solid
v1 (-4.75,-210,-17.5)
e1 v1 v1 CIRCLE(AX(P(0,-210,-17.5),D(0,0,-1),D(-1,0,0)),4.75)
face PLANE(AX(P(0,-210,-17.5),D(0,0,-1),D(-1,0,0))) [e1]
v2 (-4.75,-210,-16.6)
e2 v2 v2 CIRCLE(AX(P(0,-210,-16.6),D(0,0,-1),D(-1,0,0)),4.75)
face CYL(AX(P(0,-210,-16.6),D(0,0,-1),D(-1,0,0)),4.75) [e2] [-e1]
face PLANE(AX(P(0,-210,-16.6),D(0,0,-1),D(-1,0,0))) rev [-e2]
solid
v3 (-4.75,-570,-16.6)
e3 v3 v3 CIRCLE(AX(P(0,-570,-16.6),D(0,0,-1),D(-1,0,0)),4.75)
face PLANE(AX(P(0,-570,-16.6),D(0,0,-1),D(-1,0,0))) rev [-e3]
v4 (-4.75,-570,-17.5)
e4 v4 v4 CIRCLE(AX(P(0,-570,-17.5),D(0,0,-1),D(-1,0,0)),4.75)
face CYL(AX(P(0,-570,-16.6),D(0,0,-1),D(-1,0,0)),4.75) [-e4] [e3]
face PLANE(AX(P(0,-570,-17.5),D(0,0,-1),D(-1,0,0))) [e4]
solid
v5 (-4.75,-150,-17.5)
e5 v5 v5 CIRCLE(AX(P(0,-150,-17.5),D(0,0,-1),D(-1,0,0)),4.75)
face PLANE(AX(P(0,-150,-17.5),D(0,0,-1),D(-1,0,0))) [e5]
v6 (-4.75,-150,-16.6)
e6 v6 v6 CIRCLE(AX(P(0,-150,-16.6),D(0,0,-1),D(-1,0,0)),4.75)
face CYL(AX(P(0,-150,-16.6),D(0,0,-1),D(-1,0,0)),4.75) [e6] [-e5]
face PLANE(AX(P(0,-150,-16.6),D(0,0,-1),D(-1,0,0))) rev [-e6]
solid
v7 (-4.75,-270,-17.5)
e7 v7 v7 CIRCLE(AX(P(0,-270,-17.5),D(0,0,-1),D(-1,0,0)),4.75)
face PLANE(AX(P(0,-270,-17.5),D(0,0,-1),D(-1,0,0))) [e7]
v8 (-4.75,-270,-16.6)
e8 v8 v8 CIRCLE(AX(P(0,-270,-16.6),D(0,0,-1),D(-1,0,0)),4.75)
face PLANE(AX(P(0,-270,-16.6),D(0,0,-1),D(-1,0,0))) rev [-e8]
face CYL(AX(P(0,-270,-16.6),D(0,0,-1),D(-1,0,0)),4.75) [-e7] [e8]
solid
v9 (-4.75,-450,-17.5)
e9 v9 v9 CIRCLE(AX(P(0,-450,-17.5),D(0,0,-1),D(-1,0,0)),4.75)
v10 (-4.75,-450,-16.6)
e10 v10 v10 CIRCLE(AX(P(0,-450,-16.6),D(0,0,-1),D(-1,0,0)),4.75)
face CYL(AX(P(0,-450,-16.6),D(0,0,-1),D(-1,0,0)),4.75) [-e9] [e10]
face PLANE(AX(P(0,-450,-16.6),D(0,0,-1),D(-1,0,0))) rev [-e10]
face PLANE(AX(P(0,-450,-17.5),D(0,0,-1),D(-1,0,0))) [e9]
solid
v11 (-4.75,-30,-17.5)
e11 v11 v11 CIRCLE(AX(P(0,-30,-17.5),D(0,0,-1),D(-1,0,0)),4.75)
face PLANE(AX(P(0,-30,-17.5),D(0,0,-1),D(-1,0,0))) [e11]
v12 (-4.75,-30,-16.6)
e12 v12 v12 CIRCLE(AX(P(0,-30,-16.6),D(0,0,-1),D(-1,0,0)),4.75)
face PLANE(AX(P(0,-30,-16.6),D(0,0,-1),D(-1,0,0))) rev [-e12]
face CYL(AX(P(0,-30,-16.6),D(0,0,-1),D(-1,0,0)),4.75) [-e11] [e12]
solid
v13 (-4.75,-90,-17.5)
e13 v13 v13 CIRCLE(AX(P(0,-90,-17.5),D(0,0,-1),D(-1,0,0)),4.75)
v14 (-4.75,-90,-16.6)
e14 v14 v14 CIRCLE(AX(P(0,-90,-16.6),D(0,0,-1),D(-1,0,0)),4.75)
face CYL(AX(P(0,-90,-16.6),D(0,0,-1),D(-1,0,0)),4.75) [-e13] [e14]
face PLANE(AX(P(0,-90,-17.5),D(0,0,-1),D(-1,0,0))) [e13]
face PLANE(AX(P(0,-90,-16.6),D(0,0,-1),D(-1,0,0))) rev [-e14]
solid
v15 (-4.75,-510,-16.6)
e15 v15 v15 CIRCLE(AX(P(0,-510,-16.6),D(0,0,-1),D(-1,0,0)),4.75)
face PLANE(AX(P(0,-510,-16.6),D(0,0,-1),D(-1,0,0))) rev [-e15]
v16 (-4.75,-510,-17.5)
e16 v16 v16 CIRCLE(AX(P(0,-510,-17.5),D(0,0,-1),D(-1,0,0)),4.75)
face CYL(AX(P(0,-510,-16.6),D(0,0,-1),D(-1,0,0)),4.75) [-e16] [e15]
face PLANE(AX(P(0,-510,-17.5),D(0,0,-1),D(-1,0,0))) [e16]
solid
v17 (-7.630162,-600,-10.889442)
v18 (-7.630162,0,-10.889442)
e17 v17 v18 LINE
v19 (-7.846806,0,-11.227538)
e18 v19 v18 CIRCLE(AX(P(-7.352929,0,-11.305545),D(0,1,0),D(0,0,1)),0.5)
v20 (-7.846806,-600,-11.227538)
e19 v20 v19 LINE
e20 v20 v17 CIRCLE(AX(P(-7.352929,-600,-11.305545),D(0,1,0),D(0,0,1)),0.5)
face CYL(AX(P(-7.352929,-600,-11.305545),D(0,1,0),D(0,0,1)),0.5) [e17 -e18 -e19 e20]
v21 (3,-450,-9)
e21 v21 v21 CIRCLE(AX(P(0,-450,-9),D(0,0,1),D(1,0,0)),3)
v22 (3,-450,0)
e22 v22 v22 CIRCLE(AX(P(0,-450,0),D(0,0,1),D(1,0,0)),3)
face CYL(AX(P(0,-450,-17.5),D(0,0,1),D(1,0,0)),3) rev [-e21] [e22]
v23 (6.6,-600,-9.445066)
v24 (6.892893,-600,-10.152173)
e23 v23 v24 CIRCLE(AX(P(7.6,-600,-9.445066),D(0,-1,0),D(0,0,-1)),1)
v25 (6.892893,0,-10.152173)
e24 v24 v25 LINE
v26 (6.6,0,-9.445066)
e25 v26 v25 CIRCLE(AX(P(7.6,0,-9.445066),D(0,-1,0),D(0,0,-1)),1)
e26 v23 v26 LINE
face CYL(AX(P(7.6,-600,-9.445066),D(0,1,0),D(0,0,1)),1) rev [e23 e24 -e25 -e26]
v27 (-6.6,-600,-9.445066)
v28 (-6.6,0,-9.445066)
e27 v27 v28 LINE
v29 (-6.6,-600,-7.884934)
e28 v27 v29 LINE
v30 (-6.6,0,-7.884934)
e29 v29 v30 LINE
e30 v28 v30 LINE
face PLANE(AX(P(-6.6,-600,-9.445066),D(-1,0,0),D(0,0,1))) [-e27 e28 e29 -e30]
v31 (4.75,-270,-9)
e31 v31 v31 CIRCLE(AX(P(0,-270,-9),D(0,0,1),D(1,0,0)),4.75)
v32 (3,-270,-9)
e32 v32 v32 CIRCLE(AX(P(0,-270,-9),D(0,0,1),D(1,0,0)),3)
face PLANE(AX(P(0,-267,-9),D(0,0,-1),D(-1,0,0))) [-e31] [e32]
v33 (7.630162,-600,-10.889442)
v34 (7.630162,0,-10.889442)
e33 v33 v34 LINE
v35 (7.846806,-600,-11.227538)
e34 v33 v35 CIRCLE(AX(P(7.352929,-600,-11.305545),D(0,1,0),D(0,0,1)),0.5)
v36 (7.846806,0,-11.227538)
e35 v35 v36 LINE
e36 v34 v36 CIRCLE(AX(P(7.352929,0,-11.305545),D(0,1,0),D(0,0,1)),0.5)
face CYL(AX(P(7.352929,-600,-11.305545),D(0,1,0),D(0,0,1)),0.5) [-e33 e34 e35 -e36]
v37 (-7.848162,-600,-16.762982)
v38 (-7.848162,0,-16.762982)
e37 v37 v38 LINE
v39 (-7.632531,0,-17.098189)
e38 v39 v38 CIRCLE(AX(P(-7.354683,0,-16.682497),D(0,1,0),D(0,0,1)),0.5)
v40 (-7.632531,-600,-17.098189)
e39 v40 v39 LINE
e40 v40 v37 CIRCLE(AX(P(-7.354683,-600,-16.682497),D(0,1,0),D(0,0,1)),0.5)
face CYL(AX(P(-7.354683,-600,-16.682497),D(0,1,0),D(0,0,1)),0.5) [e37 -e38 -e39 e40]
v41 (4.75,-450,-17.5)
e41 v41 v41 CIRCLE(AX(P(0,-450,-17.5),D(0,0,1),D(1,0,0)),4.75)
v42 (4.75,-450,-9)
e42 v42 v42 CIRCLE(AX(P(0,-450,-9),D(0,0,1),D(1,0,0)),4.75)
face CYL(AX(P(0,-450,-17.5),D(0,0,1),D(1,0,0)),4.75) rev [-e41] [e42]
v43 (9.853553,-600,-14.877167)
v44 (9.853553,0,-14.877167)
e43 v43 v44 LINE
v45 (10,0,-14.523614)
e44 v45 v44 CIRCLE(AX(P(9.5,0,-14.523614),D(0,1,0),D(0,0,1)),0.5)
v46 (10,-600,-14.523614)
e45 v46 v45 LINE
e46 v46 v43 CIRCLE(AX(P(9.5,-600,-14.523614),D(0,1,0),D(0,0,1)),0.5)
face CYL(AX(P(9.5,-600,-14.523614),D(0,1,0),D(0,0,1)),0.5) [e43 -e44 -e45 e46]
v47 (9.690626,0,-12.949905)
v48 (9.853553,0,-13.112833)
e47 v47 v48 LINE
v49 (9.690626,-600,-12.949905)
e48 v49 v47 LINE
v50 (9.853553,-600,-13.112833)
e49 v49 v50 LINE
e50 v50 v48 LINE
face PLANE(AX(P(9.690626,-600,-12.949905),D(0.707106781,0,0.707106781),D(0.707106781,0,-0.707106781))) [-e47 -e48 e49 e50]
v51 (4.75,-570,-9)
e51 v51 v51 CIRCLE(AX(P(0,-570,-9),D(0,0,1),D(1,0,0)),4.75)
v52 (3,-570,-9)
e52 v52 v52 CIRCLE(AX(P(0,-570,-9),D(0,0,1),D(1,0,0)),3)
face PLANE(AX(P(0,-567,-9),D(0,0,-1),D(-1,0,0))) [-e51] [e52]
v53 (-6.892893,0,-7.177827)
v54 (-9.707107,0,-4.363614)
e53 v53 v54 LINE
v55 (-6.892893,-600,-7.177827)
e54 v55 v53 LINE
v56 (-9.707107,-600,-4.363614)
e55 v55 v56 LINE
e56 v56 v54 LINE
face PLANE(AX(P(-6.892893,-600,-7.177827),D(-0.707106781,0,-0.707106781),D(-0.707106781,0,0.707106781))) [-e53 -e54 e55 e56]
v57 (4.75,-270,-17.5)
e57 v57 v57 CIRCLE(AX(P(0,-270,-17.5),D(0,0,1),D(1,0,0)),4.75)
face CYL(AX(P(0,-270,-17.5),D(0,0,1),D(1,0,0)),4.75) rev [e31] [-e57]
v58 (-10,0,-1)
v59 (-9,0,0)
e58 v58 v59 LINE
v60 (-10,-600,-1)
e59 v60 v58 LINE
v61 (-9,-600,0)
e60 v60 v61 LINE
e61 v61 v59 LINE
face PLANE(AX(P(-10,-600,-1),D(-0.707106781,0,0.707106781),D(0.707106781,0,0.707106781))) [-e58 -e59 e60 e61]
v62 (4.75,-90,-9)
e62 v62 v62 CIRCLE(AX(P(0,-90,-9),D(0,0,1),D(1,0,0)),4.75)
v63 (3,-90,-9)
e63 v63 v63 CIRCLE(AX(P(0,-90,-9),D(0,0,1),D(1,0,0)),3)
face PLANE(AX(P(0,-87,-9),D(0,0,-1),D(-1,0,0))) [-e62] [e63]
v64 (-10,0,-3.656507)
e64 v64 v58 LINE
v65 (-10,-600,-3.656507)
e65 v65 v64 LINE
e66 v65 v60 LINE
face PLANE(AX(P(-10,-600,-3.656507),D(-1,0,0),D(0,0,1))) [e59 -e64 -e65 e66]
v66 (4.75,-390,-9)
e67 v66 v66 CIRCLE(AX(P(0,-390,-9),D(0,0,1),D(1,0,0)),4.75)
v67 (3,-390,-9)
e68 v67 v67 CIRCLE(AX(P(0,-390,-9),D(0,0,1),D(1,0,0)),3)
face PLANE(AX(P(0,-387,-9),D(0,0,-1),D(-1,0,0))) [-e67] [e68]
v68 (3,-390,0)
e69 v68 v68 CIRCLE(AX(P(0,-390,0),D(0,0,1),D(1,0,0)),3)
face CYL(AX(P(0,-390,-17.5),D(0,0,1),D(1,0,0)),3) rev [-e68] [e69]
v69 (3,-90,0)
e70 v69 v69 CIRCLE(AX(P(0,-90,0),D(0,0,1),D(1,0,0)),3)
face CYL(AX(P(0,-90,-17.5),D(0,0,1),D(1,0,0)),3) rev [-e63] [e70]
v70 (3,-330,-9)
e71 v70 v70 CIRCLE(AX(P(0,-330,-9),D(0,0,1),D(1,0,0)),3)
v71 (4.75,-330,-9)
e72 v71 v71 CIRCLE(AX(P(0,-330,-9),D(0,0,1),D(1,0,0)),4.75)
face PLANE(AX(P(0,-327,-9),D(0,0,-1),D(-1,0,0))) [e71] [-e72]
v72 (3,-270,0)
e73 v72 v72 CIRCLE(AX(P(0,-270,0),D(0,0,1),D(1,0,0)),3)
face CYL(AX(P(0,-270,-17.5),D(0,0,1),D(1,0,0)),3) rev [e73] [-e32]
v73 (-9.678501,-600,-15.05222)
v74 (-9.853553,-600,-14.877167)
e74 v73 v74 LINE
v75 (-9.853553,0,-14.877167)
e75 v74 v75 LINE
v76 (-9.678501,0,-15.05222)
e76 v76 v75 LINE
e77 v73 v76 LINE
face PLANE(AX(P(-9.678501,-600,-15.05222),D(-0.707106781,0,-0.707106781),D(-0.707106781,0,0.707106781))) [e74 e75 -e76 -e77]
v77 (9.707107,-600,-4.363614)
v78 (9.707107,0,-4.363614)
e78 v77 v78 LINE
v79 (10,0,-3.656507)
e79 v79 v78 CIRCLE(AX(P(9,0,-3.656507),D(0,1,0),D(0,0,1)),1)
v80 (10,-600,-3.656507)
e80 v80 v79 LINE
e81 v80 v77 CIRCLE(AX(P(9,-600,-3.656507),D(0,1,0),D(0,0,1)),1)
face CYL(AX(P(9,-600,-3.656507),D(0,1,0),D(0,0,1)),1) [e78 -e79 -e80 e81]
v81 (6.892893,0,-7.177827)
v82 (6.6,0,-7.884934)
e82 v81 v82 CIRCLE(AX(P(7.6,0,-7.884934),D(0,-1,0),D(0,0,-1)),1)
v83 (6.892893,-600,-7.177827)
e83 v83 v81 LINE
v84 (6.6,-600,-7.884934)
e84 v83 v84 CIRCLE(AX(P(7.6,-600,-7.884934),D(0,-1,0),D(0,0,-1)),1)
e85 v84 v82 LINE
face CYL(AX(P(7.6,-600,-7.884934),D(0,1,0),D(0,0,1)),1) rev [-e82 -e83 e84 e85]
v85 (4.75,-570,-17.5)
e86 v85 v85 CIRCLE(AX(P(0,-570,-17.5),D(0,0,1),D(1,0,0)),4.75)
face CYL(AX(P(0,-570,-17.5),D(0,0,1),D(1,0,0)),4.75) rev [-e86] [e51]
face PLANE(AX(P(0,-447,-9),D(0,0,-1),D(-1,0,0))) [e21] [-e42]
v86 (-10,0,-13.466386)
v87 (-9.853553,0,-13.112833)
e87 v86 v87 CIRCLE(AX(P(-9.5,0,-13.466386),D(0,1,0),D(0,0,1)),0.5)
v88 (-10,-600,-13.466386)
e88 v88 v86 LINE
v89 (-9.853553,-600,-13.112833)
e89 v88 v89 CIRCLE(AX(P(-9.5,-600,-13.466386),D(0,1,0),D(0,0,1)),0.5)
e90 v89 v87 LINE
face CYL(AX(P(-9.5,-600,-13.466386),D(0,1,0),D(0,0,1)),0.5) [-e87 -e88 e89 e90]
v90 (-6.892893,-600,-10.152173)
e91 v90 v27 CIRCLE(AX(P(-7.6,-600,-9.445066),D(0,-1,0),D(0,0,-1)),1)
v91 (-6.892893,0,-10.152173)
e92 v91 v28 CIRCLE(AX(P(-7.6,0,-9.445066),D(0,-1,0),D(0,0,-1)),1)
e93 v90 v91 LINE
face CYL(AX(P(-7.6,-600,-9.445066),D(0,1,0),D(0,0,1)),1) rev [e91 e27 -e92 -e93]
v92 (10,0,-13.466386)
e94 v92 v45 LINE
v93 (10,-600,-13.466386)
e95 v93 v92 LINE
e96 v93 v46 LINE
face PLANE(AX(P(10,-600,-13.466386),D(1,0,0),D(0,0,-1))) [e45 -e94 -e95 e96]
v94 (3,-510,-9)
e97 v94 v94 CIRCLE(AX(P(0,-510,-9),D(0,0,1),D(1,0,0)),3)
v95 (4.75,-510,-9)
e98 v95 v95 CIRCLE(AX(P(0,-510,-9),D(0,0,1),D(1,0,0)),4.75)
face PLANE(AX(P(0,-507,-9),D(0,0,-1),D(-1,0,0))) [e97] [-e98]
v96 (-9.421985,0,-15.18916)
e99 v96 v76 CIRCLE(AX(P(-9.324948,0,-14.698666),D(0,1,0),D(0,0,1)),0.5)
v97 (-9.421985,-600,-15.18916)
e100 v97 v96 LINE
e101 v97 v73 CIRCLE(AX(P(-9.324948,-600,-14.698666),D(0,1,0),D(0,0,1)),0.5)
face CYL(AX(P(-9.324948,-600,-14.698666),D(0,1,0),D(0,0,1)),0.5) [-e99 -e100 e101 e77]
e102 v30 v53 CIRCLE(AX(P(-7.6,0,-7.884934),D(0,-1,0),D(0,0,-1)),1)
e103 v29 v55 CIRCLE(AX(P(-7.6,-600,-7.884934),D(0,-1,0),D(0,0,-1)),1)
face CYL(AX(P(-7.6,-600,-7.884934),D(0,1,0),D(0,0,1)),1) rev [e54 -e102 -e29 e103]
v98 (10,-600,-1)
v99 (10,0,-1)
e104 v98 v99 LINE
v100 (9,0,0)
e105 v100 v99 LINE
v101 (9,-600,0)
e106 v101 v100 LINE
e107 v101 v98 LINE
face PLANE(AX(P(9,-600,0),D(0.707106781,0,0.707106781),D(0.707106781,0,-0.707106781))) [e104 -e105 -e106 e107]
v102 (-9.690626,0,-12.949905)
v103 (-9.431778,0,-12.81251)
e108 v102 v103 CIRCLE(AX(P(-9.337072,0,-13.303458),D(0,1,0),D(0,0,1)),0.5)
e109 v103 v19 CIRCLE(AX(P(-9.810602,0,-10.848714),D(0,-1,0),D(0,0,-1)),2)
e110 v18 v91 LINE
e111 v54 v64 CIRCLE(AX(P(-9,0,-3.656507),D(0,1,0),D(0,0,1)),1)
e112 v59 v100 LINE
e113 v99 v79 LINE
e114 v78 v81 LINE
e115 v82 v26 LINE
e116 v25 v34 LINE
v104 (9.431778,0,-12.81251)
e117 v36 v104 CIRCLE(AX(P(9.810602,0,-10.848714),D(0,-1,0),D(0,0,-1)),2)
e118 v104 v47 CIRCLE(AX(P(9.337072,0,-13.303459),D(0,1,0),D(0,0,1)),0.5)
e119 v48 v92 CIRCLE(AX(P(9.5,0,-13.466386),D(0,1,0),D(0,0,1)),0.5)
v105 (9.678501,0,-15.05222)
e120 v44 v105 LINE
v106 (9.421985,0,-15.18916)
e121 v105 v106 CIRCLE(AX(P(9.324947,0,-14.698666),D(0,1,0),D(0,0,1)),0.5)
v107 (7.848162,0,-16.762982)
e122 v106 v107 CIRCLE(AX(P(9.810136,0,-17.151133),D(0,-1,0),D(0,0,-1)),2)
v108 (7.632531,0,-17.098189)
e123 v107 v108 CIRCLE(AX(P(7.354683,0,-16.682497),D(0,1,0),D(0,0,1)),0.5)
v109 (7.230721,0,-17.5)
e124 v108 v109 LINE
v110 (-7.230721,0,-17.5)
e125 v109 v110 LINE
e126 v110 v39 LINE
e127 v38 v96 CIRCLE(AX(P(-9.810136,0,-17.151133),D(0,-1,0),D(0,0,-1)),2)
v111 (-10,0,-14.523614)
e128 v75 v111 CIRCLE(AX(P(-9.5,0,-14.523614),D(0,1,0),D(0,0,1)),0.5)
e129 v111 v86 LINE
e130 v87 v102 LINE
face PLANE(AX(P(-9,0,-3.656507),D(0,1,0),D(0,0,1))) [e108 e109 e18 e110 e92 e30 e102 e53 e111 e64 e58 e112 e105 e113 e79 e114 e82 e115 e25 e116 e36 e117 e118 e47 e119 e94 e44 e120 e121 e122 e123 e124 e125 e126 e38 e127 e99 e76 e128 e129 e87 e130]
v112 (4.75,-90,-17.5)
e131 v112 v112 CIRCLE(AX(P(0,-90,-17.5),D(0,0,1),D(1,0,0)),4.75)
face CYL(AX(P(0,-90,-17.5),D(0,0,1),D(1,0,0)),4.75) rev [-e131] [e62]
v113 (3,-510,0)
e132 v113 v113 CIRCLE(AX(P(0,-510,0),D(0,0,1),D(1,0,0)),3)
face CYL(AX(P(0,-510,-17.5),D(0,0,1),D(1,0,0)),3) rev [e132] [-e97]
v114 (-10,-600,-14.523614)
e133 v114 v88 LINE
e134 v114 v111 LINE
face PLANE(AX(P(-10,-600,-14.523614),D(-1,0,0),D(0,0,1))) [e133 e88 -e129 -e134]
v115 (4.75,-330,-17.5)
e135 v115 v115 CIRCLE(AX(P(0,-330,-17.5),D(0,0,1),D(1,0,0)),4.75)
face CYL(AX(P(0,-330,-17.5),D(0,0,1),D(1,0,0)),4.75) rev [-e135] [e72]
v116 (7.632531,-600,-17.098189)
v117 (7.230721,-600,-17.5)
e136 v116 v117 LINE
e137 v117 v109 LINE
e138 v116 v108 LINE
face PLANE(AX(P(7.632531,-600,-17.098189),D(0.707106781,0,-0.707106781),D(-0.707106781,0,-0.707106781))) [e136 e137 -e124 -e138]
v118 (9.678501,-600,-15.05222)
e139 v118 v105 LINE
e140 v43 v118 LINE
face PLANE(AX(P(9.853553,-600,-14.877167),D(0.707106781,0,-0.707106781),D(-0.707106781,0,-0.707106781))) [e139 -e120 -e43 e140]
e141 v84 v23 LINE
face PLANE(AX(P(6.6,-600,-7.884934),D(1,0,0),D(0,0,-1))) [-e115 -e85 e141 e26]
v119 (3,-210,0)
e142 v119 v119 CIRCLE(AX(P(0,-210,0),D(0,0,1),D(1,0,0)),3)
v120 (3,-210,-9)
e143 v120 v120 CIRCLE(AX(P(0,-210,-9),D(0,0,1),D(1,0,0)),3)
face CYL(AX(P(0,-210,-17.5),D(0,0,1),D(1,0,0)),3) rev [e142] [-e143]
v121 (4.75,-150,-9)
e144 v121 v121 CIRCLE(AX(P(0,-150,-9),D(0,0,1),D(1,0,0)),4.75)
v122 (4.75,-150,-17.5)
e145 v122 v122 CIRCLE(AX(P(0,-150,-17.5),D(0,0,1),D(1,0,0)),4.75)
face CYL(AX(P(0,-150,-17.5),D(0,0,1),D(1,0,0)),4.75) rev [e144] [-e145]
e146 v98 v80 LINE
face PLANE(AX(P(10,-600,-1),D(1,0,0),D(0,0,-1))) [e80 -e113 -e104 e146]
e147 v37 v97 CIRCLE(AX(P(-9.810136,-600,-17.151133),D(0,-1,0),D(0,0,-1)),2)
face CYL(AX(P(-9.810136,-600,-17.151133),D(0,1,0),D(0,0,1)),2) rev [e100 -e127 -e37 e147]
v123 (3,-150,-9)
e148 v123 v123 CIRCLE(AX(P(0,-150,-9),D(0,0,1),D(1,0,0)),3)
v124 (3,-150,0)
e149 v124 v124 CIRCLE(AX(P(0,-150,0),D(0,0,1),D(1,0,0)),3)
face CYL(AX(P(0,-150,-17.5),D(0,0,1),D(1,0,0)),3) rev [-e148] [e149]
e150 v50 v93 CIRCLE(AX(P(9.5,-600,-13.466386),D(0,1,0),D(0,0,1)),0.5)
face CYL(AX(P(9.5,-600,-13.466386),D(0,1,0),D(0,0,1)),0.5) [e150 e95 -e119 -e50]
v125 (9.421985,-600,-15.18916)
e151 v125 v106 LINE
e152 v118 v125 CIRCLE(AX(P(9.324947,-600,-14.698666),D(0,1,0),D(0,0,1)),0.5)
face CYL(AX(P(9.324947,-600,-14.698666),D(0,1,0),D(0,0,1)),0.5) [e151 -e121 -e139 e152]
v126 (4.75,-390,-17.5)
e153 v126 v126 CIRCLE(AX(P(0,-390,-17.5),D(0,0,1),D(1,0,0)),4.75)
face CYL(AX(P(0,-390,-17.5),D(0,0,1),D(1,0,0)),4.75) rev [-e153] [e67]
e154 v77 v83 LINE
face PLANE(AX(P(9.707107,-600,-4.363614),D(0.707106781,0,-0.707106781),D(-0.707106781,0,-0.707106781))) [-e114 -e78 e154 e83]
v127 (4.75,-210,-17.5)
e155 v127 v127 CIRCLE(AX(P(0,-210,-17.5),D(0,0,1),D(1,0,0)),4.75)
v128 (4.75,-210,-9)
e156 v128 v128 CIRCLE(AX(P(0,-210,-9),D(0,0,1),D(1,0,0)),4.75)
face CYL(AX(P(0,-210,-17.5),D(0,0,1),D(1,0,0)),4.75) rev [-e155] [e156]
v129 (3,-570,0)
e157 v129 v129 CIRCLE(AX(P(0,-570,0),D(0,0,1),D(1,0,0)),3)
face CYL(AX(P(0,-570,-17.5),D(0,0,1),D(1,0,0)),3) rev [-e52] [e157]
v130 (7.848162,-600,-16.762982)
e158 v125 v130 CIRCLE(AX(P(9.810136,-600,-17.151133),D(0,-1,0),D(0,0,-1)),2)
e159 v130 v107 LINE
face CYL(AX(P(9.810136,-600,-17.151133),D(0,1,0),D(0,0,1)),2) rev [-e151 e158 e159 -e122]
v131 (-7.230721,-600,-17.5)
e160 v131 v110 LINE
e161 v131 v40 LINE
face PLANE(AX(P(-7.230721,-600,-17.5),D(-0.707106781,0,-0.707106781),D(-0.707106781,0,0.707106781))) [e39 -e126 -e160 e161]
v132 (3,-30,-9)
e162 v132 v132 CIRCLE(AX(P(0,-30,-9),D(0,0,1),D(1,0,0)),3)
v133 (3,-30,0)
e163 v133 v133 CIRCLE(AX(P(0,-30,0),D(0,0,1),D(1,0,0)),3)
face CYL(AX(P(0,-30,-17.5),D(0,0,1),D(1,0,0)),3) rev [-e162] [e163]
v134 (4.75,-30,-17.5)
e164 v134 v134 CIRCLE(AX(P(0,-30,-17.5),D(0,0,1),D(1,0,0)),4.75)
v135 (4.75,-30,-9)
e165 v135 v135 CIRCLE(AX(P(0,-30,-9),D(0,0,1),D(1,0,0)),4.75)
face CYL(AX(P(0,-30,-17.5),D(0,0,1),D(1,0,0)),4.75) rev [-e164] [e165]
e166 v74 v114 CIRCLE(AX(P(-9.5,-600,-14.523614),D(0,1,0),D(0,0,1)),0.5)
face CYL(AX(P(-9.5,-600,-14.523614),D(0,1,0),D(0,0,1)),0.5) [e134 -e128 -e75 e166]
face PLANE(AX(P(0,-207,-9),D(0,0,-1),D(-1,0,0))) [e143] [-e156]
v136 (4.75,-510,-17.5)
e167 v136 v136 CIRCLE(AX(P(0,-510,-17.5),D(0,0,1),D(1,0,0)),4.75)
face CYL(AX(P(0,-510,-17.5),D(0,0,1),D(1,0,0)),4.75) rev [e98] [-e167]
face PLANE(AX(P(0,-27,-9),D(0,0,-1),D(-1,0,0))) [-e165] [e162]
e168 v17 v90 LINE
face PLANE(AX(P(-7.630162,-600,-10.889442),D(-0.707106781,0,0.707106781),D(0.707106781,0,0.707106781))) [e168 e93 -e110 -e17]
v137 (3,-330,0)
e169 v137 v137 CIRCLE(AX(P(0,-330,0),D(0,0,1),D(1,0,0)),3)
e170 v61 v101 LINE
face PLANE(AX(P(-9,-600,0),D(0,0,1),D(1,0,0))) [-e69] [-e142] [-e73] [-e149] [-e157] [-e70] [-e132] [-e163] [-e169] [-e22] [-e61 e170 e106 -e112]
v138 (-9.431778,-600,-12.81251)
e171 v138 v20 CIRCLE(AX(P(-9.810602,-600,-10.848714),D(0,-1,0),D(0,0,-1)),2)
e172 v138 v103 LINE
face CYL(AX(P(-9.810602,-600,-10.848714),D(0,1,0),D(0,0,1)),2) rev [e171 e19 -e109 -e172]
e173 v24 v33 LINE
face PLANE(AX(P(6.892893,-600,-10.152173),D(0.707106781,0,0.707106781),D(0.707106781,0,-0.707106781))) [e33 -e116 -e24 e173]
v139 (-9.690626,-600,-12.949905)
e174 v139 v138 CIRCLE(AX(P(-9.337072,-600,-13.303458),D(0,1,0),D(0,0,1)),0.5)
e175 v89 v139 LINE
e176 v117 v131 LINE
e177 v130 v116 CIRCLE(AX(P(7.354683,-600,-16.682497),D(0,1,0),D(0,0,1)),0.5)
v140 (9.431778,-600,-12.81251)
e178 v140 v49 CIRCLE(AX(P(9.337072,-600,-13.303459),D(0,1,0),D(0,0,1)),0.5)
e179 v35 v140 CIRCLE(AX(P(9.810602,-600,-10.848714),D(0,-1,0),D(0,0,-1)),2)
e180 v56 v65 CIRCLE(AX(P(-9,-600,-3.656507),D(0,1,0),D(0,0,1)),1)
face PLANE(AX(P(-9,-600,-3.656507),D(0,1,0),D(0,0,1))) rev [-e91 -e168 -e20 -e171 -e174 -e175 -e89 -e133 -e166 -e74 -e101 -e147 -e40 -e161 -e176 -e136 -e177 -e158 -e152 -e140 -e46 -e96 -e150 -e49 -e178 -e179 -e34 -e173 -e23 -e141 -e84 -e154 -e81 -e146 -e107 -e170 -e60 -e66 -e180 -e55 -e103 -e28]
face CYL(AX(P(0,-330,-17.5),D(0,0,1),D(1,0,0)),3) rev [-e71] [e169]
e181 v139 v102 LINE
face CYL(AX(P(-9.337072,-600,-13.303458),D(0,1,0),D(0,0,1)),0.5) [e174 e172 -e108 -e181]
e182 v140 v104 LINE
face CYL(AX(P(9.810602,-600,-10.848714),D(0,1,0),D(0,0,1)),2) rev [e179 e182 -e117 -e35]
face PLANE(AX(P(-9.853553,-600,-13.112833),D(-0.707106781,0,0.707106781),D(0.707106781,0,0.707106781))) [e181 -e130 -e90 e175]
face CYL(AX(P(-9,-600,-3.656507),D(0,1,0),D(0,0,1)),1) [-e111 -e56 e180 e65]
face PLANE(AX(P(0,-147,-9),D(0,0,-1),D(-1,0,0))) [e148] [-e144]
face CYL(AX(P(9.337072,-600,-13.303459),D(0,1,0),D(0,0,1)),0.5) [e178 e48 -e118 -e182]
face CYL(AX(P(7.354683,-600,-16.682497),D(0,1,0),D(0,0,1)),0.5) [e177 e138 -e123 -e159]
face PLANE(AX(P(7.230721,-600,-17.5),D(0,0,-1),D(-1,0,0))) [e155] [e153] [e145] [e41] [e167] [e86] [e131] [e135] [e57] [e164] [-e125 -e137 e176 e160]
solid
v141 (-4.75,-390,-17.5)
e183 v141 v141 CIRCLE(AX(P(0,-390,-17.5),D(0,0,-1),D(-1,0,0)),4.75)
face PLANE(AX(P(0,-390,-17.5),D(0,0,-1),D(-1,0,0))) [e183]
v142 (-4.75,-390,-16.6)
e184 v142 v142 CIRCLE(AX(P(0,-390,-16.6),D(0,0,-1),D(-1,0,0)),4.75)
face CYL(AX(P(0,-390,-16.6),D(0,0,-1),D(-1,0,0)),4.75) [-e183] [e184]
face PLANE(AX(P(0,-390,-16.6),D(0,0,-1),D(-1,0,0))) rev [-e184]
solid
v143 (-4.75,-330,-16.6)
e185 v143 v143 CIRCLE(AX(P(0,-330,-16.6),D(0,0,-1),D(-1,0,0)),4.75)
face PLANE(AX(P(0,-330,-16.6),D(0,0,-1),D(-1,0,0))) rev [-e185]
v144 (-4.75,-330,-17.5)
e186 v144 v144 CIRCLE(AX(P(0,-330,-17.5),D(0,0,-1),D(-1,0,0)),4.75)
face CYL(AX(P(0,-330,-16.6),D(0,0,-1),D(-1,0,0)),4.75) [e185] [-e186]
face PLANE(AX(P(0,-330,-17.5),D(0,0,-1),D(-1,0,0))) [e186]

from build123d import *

# Parameters (mm, degrees)
EXTRUDE_1_DEPTH               = 600
SKETCH_80_R                   = 4.75
EXTRUDE_12_DEPTH              = 0.9
PATTERN_START                 = -17.499999985
PATTERN_LINEAR_1_OUTLINE_R    = 4.75
PATTERN_LINEAR_1_DEPTH        = 0.9
PATTERN_LINEAR_1_2_OUTLINE_R  = 4.75
PATTERN_LINEAR_1_2_DEPTH      = 0.9
PATTERN_LINEAR_1_3_OUTLINE_R  = 4.75
PATTERN_LINEAR_1_3_DEPTH      = 0.9
PATTERN_LINEAR_1_4_OUTLINE_R  = 4.75
PATTERN_LINEAR_1_4_DEPTH      = 0.9
PATTERN_LINEAR_1_5_OUTLINE_R  = 4.75
PATTERN_LINEAR_1_5_DEPTH      = 0.9
PATTERN_LINEAR_1_6_OUTLINE_R  = 4.75
PATTERN_LINEAR_1_6_DEPTH      = 0.9
PATTERN_LINEAR_1_7_OUTLINE_R  = 4.75
PATTERN_LINEAR_1_7_DEPTH      = 0.9
PATTERN_LINEAR_1_8_OUTLINE_R  = 4.75
PATTERN_LINEAR_1_8_DEPTH      = 0.9
PATTERN_LINEAR_1_9_OUTLINE_R  = 4.75
PATTERN_LINEAR_1_9_DEPTH      = 0.9
PATTERN_LINEAR_1_10_OUTLINE_R = 4.75
PATTERN_LINEAR_1_10_DEPTH     = 8.499999985
PATTERN_START_2               = -9
PATTERN_LINEAR_1_11_OUTLINE_R = 3
PATTERN_LINEAR_1_11_DEPTH     = 9


# Read off the part's stored shape, not the designer's step: Линейный массив1
with BuildPart() as part:
    # Эскиз1 → Бобышка-Вытянуть1 (new body)
    with BuildSketch(Plane(origin=(0, 0, 0), x_dir=(1, 0, 0), z_dir=(0, 1, 0))):
        with BuildLine():
            Line((-10, 3.656507036), (-10, 1))
            Line((-10, 1), (-9, 0))
            Line((-9, 0), (9, 0))
            Line((9, 0), (10, 1))
            Line((10, 1), (10, 3.656507036))
            ThreePointArc((10, 3.656507036), (9.92387953, 4.039190479), (9.707106773, 4.363613837))
            Line((9.707106773, 4.363613837), (6.892893227, 7.177827383))
            ThreePointArc((6.892893227, 7.177827383), (6.67612047, 7.502250741), (6.6, 7.884934184))
            Line((6.6, 7.884934184), (6.6, 9.445065806))
            ThreePointArc((6.6, 9.445065806), (6.67612047, 9.827749249), (6.892893227, 10.152172607))
            Line((6.892893227, 10.152172607), (7.63016236, 10.88944174))
            ThreePointArc((7.63016236, 10.88944174), (7.773916172, 11.035785914), (7.84680643, 11.2275378))
            ThreePointArc((7.84680643, 11.2275378), (8.39638832, 12.26292769), (9.431778202, 12.812509595))
            ThreePointArc((9.431778202, 12.812509595), (9.571493891, 12.861817755), (9.690625709, 12.949905089))
            Line((9.690625709, 12.949905089), (9.85355341, 13.11283279))
            ThreePointArc((9.85355341, 13.11283279), (9.961939771, 13.275044443), (10, 13.466386134))
            Line((10, 13.466386134), (10, 14.523613836))
            ThreePointArc((10, 14.523613836), (9.961939771, 14.714955527), (9.85355341, 14.87716718))
            Line((9.85355341, 14.87716718), (9.678500897, 15.052219693))
            ThreePointArc((9.678500897, 15.052219693), (9.560417661, 15.139748844), (9.421985093, 15.189159641))
            ThreePointArc((9.421985093, 15.189159641), (8.395921978, 15.736919382), (7.84816224, 16.7629825))
            ThreePointArc((7.84816224, 16.7629825), (7.775191486, 16.953000828), (7.632531165, 17.098189425))
            Line((7.632531165, 17.098189425), (7.230720605, 17.499999985))
            Line((7.230720605, 17.499999985), (-7.230720615, 17.499999985))
            Line((-7.230720615, 17.499999985), (-7.632531175, 17.098189425))
            ThreePointArc((-7.632531175, 17.098189425), (-7.775191503, 16.953000832), (-7.84816225, 16.7629825))
            ThreePointArc((-7.84816225, 16.7629825), (-8.395921997, 15.736919373), (-9.421985128, 15.189159636))
            ThreePointArc((-9.421985128, 15.189159636), (-9.560417671, 15.13974885), (-9.678500884, 15.052219716))
            Line((-9.678500884, 15.052219716), (-9.85355341, 14.87716719))
            ThreePointArc((-9.85355341, 14.87716719), (-9.961939771, 14.714955537), (-10, 14.523613846))
            Line((-10, 14.523613846), (-10, 13.466386134))
            ThreePointArc((-10, 13.466386134), (-9.961939771, 13.275044443), (-9.85355341, 13.11283279))
            Line((-9.85355341, 13.11283279), (-9.690625667, 12.949905047))
            ThreePointArc((-9.690625667, 12.949905047), (-9.57149389, 12.861817745), (-9.431778248, 12.812509604))
            ThreePointArc((-9.431778248, 12.812509604), (-8.396388337, 12.262927707), (-7.84680643, 11.2275378))
            ThreePointArc((-7.84680643, 11.2275378), (-7.773916168, 11.035785916), (-7.63016236, 10.88944174))
            Line((-7.63016236, 10.88944174), (-6.892893227, 10.152172607))
            ThreePointArc((-6.892893227, 10.152172607), (-6.67612047, 9.827749249), (-6.6, 9.445065806))
            Line((-6.6, 9.445065806), (-6.6, 7.884934184))
            ThreePointArc((-6.6, 7.884934184), (-6.67612047, 7.502250741), (-6.892893227, 7.177827383))
            Line((-6.892893227, 7.177827383), (-9.707106773, 4.363613837))
            ThreePointArc((-9.707106773, 4.363613837), (-9.92387953, 4.039190479), (-10, 3.656507036))
        make_face()
    extrude(amount=-EXTRUDE_1_DEPTH)

    # Эскиз6 → Вырез-Повернуть1 (revolve, cut)
    with BuildSketch(Plane(origin=(0, 30, 0), x_dir=(0, -1, 0), z_dir=(1, 0, 0)), mode=Mode.PRIVATE) as cut_revolve_1_sk:
        Polygon((55.25, 17.499999985), (60, 17.499999985), (60, 0), (57, 0), (57, 9), (55.25, 9), align=None)
    revolve(cut_revolve_1_sk.sketch.rotate(Axis((0, -30, -17.499999985), (0, 0, 1)), 270), axis=Axis((0, -30, -17.499999985), (0, 0, 1)), mode=Mode.SUBTRACT)

    # Pattern Linear 1 10 outline → Pattern Linear 1 10 (cut)
    with BuildSketch(Plane.XY.offset(PATTERN_START)):
        with Locations((0, -90)):
            Circle(PATTERN_LINEAR_1_10_OUTLINE_R)
        with Locations((0, -150)):
            Circle(PATTERN_LINEAR_1_10_OUTLINE_R)
        with Locations((0, -210)):
            Circle(PATTERN_LINEAR_1_10_OUTLINE_R)
        with Locations((0, -270)):
            Circle(PATTERN_LINEAR_1_10_OUTLINE_R)
        with Locations((0, -330)):
            Circle(PATTERN_LINEAR_1_10_OUTLINE_R)
        with Locations((0, -390)):
            Circle(PATTERN_LINEAR_1_10_OUTLINE_R)
        with Locations((0, -450)):
            Circle(PATTERN_LINEAR_1_10_OUTLINE_R)
        with Locations((0, -510)):
            Circle(PATTERN_LINEAR_1_10_OUTLINE_R)
        with Locations((0, -570)):
            Circle(PATTERN_LINEAR_1_10_OUTLINE_R)
    extrude(amount=PATTERN_LINEAR_1_10_DEPTH, mode=Mode.SUBTRACT)

    # Pattern Linear 1 11 outline → Pattern Linear 1 11 (cut)
    with BuildSketch(Plane.XY.offset(PATTERN_START_2)):
        with Locations((0, -90)):
            Circle(PATTERN_LINEAR_1_11_OUTLINE_R)
        with Locations((0, -150)):
            Circle(PATTERN_LINEAR_1_11_OUTLINE_R)
        with Locations((0, -210)):
            Circle(PATTERN_LINEAR_1_11_OUTLINE_R)
        with Locations((0, -270)):
            Circle(PATTERN_LINEAR_1_11_OUTLINE_R)
        with Locations((0, -330)):
            Circle(PATTERN_LINEAR_1_11_OUTLINE_R)
        with Locations((0, -390)):
            Circle(PATTERN_LINEAR_1_11_OUTLINE_R)
        with Locations((0, -450)):
            Circle(PATTERN_LINEAR_1_11_OUTLINE_R)
        with Locations((0, -510)):
            Circle(PATTERN_LINEAR_1_11_OUTLINE_R)
        with Locations((0, -570)):
            Circle(PATTERN_LINEAR_1_11_OUTLINE_R)
    extrude(amount=PATTERN_LINEAR_1_11_DEPTH, mode=Mode.SUBTRACT)


with BuildPart() as body_2:
    # Эскиз80 → Бобышка-Вытянуть12 (new body)
    with BuildSketch(Plane(origin=(0, 0, -17.499999985), x_dir=(-1, 0, 0), z_dir=(0, 0, -1))):
        with Locations((0, -30)):
            Circle(SKETCH_80_R)
    extrude(amount=-EXTRUDE_12_DEPTH)


with BuildPart() as body_3:
    # Линейный массив1 outline → Линейный массив1 (new body)
    with BuildSketch(Plane.XY.offset(PATTERN_START)):
        with Locations((0, -570)):
            Circle(PATTERN_LINEAR_1_OUTLINE_R)
    extrude(amount=PATTERN_LINEAR_1_DEPTH)


with BuildPart() as body_4:
    # Pattern Linear 1 2 outline → Pattern Linear 1 2 (new body)
    with BuildSketch(Plane.XY.offset(PATTERN_START)):
        with Locations((0, -510)):
            Circle(PATTERN_LINEAR_1_2_OUTLINE_R)
    extrude(amount=PATTERN_LINEAR_1_2_DEPTH)


with BuildPart() as body_5:
    # Pattern Linear 1 3 outline → Pattern Linear 1 3 (new body)
    with BuildSketch(Plane.XY.offset(PATTERN_START)):
        with Locations((0, -450)):
            Circle(PATTERN_LINEAR_1_3_OUTLINE_R)
    extrude(amount=PATTERN_LINEAR_1_3_DEPTH)


with BuildPart() as body_6:
    # Pattern Linear 1 4 outline → Pattern Linear 1 4 (new body)
    with BuildSketch(Plane.XY.offset(PATTERN_START)):
        with Locations((0, -390)):
            Circle(PATTERN_LINEAR_1_4_OUTLINE_R)
    extrude(amount=PATTERN_LINEAR_1_4_DEPTH)


with BuildPart() as body_7:
    # Pattern Linear 1 5 outline → Pattern Linear 1 5 (new body)
    with BuildSketch(Plane.XY.offset(PATTERN_START)):
        with Locations((0, -330)):
            Circle(PATTERN_LINEAR_1_5_OUTLINE_R)
    extrude(amount=PATTERN_LINEAR_1_5_DEPTH)


with BuildPart() as body_8:
    # Pattern Linear 1 6 outline → Pattern Linear 1 6 (new body)
    with BuildSketch(Plane.XY.offset(PATTERN_START)):
        with Locations((0, -270)):
            Circle(PATTERN_LINEAR_1_6_OUTLINE_R)
    extrude(amount=PATTERN_LINEAR_1_6_DEPTH)


with BuildPart() as body_9:
    # Pattern Linear 1 7 outline → Pattern Linear 1 7 (new body)
    with BuildSketch(Plane.XY.offset(PATTERN_START)):
        with Locations((0, -210)):
            Circle(PATTERN_LINEAR_1_7_OUTLINE_R)
    extrude(amount=PATTERN_LINEAR_1_7_DEPTH)


with BuildPart() as body_10:
    # Pattern Linear 1 8 outline → Pattern Linear 1 8 (new body)
    with BuildSketch(Plane.XY.offset(PATTERN_START)):
        with Locations((0, -150)):
            Circle(PATTERN_LINEAR_1_8_OUTLINE_R)
    extrude(amount=PATTERN_LINEAR_1_8_DEPTH)


with BuildPart() as body_11:
    # Pattern Linear 1 9 outline → Pattern Linear 1 9 (new body)
    with BuildSketch(Plane.XY.offset(PATTERN_START)):
        with Locations((0, -90)):
            Circle(PATTERN_LINEAR_1_9_OUTLINE_R)
    extrude(amount=PATTERN_LINEAR_1_9_DEPTH)


solid = Compound([part.part, body_2.part, body_3.part, body_4.part, body_5.part, body_6.part, body_7.part, body_8.part, body_9.part, body_10.part, body_11.part])
